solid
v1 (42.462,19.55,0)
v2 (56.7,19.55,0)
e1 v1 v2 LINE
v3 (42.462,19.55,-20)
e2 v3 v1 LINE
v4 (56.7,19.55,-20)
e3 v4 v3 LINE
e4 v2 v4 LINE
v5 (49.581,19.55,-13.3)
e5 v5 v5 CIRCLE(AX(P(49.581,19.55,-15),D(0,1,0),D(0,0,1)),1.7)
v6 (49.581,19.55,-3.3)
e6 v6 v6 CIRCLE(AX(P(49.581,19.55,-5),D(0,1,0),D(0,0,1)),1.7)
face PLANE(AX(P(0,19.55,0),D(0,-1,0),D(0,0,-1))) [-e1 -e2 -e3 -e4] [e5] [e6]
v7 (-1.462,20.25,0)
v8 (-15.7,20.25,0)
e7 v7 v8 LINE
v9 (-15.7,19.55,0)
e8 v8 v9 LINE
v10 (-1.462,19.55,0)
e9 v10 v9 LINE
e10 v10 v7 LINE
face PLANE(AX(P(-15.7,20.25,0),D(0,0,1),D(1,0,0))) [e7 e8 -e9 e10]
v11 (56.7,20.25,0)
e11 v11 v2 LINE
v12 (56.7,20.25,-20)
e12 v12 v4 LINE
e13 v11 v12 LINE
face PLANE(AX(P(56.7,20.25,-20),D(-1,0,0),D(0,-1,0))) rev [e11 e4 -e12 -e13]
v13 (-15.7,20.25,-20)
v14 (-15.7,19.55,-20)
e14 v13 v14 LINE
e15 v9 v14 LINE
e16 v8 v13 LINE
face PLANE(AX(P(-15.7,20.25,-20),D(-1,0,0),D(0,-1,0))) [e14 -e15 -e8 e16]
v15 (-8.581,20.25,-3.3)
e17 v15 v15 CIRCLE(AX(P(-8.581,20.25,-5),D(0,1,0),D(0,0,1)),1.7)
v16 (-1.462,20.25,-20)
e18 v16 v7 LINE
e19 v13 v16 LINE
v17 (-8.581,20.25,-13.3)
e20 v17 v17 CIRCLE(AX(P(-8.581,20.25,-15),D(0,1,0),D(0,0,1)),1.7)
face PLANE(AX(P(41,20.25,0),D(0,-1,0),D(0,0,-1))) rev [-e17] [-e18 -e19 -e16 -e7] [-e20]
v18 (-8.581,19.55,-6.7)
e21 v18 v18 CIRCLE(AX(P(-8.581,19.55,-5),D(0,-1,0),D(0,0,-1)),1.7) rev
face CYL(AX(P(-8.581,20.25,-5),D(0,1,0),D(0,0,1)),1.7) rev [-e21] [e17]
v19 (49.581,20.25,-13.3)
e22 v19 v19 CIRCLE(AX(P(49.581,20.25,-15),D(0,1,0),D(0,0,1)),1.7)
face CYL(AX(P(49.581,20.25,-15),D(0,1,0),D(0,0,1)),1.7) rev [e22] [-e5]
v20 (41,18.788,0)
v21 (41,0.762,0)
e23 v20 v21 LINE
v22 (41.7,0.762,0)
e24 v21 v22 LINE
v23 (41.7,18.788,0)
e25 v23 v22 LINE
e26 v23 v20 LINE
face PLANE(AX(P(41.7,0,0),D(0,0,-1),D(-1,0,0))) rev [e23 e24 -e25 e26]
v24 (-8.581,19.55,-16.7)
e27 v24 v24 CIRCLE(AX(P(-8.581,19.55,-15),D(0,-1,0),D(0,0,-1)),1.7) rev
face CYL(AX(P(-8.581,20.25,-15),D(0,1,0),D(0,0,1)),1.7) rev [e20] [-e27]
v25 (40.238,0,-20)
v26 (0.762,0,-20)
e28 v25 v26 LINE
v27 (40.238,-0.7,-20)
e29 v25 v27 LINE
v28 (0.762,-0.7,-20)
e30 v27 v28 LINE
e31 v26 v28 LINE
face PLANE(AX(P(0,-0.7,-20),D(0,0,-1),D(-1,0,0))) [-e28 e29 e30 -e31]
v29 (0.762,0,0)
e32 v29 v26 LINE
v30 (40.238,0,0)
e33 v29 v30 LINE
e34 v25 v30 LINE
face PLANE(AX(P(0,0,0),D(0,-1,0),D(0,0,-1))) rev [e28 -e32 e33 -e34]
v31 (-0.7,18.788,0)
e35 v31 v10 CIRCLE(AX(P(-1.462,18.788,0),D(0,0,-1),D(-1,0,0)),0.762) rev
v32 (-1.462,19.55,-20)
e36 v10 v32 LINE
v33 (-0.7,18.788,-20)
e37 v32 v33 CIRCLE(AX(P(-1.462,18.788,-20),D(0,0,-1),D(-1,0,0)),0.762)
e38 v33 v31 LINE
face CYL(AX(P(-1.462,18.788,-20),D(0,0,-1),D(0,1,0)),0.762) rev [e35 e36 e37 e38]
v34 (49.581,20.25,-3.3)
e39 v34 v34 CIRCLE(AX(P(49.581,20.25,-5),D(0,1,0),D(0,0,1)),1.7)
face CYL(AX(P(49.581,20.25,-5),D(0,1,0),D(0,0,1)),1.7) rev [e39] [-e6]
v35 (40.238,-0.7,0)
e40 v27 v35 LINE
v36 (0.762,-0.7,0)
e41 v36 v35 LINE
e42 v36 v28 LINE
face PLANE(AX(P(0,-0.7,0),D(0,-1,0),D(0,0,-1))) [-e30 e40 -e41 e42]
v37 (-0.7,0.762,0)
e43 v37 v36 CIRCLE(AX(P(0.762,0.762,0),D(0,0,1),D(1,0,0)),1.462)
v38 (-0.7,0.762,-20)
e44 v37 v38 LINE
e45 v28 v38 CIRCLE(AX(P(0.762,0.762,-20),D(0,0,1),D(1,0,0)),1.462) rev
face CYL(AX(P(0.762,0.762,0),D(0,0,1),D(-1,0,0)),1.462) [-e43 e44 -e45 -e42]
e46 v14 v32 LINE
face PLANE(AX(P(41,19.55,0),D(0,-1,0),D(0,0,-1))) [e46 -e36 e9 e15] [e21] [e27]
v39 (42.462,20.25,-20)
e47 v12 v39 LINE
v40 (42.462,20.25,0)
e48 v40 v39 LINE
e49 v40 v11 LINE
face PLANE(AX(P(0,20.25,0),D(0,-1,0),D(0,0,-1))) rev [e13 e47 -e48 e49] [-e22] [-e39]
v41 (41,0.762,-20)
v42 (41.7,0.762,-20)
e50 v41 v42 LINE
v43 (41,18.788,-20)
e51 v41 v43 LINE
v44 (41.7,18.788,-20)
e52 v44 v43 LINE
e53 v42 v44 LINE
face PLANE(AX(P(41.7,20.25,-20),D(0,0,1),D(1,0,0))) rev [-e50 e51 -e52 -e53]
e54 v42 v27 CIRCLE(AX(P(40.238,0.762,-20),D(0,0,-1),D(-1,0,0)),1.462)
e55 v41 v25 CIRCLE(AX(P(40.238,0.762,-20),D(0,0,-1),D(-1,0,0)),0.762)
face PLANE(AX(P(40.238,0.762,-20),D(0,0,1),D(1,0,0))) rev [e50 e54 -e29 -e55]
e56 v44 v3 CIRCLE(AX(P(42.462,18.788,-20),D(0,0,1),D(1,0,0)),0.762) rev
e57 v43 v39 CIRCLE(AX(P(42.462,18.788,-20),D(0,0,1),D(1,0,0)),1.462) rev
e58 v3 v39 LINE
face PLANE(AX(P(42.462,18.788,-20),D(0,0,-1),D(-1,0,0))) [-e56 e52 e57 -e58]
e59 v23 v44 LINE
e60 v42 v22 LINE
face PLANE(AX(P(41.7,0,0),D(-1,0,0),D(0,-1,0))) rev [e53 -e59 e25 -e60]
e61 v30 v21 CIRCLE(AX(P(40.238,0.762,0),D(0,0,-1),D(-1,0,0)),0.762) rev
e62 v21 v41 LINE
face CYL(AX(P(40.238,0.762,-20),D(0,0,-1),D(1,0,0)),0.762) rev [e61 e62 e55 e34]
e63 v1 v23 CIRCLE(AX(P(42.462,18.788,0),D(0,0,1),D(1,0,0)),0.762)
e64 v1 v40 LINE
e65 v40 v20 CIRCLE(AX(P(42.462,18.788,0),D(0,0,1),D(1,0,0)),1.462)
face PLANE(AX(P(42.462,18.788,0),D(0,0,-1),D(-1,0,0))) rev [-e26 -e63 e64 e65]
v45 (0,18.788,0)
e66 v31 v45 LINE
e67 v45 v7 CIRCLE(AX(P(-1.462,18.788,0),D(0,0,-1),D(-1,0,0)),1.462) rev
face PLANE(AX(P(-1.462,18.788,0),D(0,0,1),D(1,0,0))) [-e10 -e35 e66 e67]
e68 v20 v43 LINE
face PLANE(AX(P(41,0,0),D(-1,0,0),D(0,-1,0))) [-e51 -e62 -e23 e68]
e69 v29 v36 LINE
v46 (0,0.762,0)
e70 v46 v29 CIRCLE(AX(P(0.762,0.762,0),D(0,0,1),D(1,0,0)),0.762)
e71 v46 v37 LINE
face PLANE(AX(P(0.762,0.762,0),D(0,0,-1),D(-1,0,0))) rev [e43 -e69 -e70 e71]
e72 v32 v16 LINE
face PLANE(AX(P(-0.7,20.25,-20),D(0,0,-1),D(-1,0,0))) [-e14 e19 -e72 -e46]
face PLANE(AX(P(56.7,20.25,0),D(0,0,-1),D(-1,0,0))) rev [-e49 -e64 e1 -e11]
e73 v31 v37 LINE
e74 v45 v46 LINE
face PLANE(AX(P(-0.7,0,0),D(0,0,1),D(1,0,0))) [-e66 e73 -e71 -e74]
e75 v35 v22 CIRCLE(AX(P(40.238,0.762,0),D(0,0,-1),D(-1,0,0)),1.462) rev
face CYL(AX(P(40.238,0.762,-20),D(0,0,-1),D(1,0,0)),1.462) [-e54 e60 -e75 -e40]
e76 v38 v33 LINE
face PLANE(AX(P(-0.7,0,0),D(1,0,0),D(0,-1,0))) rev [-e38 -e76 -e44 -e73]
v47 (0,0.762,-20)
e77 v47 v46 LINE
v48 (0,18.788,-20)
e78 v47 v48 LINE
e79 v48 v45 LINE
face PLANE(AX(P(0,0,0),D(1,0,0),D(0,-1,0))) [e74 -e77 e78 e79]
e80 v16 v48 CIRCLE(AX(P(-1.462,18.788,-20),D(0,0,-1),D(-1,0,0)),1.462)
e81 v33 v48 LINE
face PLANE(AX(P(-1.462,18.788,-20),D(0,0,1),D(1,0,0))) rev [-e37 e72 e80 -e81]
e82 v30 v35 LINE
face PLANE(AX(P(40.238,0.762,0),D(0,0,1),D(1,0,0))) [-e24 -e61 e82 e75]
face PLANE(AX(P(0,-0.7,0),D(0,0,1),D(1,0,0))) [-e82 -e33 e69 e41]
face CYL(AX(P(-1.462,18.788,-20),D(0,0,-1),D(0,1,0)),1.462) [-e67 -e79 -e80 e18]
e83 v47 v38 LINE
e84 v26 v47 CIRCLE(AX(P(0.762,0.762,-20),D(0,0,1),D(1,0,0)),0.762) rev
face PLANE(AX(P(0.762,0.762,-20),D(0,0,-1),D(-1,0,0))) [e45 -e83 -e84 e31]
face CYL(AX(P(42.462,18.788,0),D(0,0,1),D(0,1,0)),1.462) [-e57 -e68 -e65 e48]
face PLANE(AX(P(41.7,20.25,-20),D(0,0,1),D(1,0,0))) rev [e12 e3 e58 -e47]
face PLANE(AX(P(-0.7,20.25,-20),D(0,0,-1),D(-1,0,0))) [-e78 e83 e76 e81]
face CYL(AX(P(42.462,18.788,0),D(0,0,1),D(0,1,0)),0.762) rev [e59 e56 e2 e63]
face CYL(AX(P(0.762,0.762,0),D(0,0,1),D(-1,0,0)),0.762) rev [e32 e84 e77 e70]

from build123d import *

# Parameters (mm, degrees)
SKETCH1_W                    = 41
SKETCH1_H                    = 20
BASE_FLANGE1_DEPTH           = 0.7
EDGE_FLANGE1_STRIP_W         = 4.324
EDGE_FLANGE1_STRIP_H         = 0.7
EDGE_FLANGE1_STRIP_CUT_DEPTH = 20
EDGE_FLANGE1_DEPTH           = 20
EDGE_FLANGE2_STRIP_W         = 4.324
EDGE_FLANGE2_STRIP_H         = 0.7
EDGE_FLANGE2_STRIP_CUT_DEPTH = 20
EDGE_FLANGE2_DEPTH           = 20
M3_CLEARANCE_HOLE1_D         = 3.4


# Sheet-metal steps are written as plain solids
with BuildPart() as part:
    # Sketch1 → Base-Flange1 (new body)
    with BuildSketch(Plane(origin=(0, 0, 0), x_dir=(1, 0, 0), z_dir=(0, 1, 0))):
        with Locations((20.5, 10)):
            Rectangle(SKETCH1_W, SKETCH1_H)
    extrude(amount=-BASE_FLANGE1_DEPTH)

    # Edge-Flange1 strip (across the edge) → Edge-Flange1 strip cut (cut)
    with BuildSketch(Plane(origin=(41, 0, 0), x_dir=(-1, 0, 0), z_dir=(0, 0, -1))):
        with Locations((-1.4, -0.35)):
            Rectangle(EDGE_FLANGE1_STRIP_W, EDGE_FLANGE1_STRIP_H)
    edge_flange1_strip_cut = extrude(amount=EDGE_FLANGE1_STRIP_CUT_DEPTH, mode=Mode.SUBTRACT)

    # Edge-Flange1 section (across the edge) → Edge-Flange1 (add)
    with BuildSketch(Plane(origin=(41, 0, 0), x_dir=(-1, 0, 0), z_dir=(0, 0, -1))):
        with BuildLine():
            Line((-0.7, 0.762), (-0.7, 20.25))
            Line((-0.7, 20.25), (0, 20.25))
            Line((0, 20.25), (0, 0.762))
            ThreePointArc((0, 0.762), (0.223184633, 0.223184633), (0.762, 0))
            Line((0.762, 0), (0.762, -0.7))
            ThreePointArc((0.762, -0.7), (-0.271790114, -0.271790114), (-0.7, 0.762))
        make_face()
    edge_flange1 = extrude(amount=EDGE_FLANGE1_DEPTH)

    # Edge-Flange2 strip (across the edge) → Edge-Flange2 strip cut (cut)
    with BuildSketch(Plane(origin=(41.7, 20.25, -20), x_dir=(0, -1, 0), z_dir=(0, 0, 1))):
        with Locations((-0.7, -0.35)):
            Rectangle(EDGE_FLANGE2_STRIP_W, EDGE_FLANGE2_STRIP_H)
    edge_flange2_strip_cut = extrude(amount=EDGE_FLANGE2_STRIP_CUT_DEPTH, mode=Mode.SUBTRACT)

    # Edge-Flange2 section (across the edge) → Edge-Flange2 (add)
    with BuildSketch(Plane(origin=(41.7, 20.25, -20), x_dir=(0, -1, 0), z_dir=(0, 0, 1))):
        with BuildLine():
            Line((0, 0.762), (0, 15))
            Line((0, 15), (0.7, 15))
            Line((0.7, 15), (0.7, 0.762))
            ThreePointArc((0.7, 0.762), (0.923184633, 0.223184633), (1.462, 0))
            Line((1.462, 0), (1.462, -0.7))
            ThreePointArc((1.462, -0.7), (0.428209886, -0.271790114), (0, 0.762))
        make_face()
    edge_flange2 = extrude(amount=EDGE_FLANGE2_DEPTH)

    # Mirror1: Edge-Flange1 strip cut, Edge-Flange1, Edge-Flange2 strip cut, Edge-Flange2 across plane
    add(edge_flange1_strip_cut.mirror(Plane(origin=(20.5, 0, 0), x_dir=(0, 0, 1), z_dir=(1, 0, 0))), mode=Mode.SUBTRACT)
    add(edge_flange1.mirror(Plane(origin=(20.5, 0, 0), x_dir=(0, 0, 1), z_dir=(1, 0, 0))))
    add(edge_flange2_strip_cut.mirror(Plane(origin=(20.5, 0, 0), x_dir=(0, 0, 1), z_dir=(1, 0, 0))), mode=Mode.SUBTRACT)
    add(edge_flange2.mirror(Plane(origin=(20.5, 0, 0), x_dir=(0, 0, 1), z_dir=(1, 0, 0))))

    # M3 Clearance Hole1 (through all)
    with Locations(Plane(origin=(0, 20.25, 0), x_dir=(1, 0, 0), z_dir=(0, 1, 0))):
        with Locations((49.581, 15), (49.581, 5), (-8.581, 15), (-8.581, 5)):
            Hole(M3_CLEARANCE_HOLE1_D / 2)


solid = part.part
